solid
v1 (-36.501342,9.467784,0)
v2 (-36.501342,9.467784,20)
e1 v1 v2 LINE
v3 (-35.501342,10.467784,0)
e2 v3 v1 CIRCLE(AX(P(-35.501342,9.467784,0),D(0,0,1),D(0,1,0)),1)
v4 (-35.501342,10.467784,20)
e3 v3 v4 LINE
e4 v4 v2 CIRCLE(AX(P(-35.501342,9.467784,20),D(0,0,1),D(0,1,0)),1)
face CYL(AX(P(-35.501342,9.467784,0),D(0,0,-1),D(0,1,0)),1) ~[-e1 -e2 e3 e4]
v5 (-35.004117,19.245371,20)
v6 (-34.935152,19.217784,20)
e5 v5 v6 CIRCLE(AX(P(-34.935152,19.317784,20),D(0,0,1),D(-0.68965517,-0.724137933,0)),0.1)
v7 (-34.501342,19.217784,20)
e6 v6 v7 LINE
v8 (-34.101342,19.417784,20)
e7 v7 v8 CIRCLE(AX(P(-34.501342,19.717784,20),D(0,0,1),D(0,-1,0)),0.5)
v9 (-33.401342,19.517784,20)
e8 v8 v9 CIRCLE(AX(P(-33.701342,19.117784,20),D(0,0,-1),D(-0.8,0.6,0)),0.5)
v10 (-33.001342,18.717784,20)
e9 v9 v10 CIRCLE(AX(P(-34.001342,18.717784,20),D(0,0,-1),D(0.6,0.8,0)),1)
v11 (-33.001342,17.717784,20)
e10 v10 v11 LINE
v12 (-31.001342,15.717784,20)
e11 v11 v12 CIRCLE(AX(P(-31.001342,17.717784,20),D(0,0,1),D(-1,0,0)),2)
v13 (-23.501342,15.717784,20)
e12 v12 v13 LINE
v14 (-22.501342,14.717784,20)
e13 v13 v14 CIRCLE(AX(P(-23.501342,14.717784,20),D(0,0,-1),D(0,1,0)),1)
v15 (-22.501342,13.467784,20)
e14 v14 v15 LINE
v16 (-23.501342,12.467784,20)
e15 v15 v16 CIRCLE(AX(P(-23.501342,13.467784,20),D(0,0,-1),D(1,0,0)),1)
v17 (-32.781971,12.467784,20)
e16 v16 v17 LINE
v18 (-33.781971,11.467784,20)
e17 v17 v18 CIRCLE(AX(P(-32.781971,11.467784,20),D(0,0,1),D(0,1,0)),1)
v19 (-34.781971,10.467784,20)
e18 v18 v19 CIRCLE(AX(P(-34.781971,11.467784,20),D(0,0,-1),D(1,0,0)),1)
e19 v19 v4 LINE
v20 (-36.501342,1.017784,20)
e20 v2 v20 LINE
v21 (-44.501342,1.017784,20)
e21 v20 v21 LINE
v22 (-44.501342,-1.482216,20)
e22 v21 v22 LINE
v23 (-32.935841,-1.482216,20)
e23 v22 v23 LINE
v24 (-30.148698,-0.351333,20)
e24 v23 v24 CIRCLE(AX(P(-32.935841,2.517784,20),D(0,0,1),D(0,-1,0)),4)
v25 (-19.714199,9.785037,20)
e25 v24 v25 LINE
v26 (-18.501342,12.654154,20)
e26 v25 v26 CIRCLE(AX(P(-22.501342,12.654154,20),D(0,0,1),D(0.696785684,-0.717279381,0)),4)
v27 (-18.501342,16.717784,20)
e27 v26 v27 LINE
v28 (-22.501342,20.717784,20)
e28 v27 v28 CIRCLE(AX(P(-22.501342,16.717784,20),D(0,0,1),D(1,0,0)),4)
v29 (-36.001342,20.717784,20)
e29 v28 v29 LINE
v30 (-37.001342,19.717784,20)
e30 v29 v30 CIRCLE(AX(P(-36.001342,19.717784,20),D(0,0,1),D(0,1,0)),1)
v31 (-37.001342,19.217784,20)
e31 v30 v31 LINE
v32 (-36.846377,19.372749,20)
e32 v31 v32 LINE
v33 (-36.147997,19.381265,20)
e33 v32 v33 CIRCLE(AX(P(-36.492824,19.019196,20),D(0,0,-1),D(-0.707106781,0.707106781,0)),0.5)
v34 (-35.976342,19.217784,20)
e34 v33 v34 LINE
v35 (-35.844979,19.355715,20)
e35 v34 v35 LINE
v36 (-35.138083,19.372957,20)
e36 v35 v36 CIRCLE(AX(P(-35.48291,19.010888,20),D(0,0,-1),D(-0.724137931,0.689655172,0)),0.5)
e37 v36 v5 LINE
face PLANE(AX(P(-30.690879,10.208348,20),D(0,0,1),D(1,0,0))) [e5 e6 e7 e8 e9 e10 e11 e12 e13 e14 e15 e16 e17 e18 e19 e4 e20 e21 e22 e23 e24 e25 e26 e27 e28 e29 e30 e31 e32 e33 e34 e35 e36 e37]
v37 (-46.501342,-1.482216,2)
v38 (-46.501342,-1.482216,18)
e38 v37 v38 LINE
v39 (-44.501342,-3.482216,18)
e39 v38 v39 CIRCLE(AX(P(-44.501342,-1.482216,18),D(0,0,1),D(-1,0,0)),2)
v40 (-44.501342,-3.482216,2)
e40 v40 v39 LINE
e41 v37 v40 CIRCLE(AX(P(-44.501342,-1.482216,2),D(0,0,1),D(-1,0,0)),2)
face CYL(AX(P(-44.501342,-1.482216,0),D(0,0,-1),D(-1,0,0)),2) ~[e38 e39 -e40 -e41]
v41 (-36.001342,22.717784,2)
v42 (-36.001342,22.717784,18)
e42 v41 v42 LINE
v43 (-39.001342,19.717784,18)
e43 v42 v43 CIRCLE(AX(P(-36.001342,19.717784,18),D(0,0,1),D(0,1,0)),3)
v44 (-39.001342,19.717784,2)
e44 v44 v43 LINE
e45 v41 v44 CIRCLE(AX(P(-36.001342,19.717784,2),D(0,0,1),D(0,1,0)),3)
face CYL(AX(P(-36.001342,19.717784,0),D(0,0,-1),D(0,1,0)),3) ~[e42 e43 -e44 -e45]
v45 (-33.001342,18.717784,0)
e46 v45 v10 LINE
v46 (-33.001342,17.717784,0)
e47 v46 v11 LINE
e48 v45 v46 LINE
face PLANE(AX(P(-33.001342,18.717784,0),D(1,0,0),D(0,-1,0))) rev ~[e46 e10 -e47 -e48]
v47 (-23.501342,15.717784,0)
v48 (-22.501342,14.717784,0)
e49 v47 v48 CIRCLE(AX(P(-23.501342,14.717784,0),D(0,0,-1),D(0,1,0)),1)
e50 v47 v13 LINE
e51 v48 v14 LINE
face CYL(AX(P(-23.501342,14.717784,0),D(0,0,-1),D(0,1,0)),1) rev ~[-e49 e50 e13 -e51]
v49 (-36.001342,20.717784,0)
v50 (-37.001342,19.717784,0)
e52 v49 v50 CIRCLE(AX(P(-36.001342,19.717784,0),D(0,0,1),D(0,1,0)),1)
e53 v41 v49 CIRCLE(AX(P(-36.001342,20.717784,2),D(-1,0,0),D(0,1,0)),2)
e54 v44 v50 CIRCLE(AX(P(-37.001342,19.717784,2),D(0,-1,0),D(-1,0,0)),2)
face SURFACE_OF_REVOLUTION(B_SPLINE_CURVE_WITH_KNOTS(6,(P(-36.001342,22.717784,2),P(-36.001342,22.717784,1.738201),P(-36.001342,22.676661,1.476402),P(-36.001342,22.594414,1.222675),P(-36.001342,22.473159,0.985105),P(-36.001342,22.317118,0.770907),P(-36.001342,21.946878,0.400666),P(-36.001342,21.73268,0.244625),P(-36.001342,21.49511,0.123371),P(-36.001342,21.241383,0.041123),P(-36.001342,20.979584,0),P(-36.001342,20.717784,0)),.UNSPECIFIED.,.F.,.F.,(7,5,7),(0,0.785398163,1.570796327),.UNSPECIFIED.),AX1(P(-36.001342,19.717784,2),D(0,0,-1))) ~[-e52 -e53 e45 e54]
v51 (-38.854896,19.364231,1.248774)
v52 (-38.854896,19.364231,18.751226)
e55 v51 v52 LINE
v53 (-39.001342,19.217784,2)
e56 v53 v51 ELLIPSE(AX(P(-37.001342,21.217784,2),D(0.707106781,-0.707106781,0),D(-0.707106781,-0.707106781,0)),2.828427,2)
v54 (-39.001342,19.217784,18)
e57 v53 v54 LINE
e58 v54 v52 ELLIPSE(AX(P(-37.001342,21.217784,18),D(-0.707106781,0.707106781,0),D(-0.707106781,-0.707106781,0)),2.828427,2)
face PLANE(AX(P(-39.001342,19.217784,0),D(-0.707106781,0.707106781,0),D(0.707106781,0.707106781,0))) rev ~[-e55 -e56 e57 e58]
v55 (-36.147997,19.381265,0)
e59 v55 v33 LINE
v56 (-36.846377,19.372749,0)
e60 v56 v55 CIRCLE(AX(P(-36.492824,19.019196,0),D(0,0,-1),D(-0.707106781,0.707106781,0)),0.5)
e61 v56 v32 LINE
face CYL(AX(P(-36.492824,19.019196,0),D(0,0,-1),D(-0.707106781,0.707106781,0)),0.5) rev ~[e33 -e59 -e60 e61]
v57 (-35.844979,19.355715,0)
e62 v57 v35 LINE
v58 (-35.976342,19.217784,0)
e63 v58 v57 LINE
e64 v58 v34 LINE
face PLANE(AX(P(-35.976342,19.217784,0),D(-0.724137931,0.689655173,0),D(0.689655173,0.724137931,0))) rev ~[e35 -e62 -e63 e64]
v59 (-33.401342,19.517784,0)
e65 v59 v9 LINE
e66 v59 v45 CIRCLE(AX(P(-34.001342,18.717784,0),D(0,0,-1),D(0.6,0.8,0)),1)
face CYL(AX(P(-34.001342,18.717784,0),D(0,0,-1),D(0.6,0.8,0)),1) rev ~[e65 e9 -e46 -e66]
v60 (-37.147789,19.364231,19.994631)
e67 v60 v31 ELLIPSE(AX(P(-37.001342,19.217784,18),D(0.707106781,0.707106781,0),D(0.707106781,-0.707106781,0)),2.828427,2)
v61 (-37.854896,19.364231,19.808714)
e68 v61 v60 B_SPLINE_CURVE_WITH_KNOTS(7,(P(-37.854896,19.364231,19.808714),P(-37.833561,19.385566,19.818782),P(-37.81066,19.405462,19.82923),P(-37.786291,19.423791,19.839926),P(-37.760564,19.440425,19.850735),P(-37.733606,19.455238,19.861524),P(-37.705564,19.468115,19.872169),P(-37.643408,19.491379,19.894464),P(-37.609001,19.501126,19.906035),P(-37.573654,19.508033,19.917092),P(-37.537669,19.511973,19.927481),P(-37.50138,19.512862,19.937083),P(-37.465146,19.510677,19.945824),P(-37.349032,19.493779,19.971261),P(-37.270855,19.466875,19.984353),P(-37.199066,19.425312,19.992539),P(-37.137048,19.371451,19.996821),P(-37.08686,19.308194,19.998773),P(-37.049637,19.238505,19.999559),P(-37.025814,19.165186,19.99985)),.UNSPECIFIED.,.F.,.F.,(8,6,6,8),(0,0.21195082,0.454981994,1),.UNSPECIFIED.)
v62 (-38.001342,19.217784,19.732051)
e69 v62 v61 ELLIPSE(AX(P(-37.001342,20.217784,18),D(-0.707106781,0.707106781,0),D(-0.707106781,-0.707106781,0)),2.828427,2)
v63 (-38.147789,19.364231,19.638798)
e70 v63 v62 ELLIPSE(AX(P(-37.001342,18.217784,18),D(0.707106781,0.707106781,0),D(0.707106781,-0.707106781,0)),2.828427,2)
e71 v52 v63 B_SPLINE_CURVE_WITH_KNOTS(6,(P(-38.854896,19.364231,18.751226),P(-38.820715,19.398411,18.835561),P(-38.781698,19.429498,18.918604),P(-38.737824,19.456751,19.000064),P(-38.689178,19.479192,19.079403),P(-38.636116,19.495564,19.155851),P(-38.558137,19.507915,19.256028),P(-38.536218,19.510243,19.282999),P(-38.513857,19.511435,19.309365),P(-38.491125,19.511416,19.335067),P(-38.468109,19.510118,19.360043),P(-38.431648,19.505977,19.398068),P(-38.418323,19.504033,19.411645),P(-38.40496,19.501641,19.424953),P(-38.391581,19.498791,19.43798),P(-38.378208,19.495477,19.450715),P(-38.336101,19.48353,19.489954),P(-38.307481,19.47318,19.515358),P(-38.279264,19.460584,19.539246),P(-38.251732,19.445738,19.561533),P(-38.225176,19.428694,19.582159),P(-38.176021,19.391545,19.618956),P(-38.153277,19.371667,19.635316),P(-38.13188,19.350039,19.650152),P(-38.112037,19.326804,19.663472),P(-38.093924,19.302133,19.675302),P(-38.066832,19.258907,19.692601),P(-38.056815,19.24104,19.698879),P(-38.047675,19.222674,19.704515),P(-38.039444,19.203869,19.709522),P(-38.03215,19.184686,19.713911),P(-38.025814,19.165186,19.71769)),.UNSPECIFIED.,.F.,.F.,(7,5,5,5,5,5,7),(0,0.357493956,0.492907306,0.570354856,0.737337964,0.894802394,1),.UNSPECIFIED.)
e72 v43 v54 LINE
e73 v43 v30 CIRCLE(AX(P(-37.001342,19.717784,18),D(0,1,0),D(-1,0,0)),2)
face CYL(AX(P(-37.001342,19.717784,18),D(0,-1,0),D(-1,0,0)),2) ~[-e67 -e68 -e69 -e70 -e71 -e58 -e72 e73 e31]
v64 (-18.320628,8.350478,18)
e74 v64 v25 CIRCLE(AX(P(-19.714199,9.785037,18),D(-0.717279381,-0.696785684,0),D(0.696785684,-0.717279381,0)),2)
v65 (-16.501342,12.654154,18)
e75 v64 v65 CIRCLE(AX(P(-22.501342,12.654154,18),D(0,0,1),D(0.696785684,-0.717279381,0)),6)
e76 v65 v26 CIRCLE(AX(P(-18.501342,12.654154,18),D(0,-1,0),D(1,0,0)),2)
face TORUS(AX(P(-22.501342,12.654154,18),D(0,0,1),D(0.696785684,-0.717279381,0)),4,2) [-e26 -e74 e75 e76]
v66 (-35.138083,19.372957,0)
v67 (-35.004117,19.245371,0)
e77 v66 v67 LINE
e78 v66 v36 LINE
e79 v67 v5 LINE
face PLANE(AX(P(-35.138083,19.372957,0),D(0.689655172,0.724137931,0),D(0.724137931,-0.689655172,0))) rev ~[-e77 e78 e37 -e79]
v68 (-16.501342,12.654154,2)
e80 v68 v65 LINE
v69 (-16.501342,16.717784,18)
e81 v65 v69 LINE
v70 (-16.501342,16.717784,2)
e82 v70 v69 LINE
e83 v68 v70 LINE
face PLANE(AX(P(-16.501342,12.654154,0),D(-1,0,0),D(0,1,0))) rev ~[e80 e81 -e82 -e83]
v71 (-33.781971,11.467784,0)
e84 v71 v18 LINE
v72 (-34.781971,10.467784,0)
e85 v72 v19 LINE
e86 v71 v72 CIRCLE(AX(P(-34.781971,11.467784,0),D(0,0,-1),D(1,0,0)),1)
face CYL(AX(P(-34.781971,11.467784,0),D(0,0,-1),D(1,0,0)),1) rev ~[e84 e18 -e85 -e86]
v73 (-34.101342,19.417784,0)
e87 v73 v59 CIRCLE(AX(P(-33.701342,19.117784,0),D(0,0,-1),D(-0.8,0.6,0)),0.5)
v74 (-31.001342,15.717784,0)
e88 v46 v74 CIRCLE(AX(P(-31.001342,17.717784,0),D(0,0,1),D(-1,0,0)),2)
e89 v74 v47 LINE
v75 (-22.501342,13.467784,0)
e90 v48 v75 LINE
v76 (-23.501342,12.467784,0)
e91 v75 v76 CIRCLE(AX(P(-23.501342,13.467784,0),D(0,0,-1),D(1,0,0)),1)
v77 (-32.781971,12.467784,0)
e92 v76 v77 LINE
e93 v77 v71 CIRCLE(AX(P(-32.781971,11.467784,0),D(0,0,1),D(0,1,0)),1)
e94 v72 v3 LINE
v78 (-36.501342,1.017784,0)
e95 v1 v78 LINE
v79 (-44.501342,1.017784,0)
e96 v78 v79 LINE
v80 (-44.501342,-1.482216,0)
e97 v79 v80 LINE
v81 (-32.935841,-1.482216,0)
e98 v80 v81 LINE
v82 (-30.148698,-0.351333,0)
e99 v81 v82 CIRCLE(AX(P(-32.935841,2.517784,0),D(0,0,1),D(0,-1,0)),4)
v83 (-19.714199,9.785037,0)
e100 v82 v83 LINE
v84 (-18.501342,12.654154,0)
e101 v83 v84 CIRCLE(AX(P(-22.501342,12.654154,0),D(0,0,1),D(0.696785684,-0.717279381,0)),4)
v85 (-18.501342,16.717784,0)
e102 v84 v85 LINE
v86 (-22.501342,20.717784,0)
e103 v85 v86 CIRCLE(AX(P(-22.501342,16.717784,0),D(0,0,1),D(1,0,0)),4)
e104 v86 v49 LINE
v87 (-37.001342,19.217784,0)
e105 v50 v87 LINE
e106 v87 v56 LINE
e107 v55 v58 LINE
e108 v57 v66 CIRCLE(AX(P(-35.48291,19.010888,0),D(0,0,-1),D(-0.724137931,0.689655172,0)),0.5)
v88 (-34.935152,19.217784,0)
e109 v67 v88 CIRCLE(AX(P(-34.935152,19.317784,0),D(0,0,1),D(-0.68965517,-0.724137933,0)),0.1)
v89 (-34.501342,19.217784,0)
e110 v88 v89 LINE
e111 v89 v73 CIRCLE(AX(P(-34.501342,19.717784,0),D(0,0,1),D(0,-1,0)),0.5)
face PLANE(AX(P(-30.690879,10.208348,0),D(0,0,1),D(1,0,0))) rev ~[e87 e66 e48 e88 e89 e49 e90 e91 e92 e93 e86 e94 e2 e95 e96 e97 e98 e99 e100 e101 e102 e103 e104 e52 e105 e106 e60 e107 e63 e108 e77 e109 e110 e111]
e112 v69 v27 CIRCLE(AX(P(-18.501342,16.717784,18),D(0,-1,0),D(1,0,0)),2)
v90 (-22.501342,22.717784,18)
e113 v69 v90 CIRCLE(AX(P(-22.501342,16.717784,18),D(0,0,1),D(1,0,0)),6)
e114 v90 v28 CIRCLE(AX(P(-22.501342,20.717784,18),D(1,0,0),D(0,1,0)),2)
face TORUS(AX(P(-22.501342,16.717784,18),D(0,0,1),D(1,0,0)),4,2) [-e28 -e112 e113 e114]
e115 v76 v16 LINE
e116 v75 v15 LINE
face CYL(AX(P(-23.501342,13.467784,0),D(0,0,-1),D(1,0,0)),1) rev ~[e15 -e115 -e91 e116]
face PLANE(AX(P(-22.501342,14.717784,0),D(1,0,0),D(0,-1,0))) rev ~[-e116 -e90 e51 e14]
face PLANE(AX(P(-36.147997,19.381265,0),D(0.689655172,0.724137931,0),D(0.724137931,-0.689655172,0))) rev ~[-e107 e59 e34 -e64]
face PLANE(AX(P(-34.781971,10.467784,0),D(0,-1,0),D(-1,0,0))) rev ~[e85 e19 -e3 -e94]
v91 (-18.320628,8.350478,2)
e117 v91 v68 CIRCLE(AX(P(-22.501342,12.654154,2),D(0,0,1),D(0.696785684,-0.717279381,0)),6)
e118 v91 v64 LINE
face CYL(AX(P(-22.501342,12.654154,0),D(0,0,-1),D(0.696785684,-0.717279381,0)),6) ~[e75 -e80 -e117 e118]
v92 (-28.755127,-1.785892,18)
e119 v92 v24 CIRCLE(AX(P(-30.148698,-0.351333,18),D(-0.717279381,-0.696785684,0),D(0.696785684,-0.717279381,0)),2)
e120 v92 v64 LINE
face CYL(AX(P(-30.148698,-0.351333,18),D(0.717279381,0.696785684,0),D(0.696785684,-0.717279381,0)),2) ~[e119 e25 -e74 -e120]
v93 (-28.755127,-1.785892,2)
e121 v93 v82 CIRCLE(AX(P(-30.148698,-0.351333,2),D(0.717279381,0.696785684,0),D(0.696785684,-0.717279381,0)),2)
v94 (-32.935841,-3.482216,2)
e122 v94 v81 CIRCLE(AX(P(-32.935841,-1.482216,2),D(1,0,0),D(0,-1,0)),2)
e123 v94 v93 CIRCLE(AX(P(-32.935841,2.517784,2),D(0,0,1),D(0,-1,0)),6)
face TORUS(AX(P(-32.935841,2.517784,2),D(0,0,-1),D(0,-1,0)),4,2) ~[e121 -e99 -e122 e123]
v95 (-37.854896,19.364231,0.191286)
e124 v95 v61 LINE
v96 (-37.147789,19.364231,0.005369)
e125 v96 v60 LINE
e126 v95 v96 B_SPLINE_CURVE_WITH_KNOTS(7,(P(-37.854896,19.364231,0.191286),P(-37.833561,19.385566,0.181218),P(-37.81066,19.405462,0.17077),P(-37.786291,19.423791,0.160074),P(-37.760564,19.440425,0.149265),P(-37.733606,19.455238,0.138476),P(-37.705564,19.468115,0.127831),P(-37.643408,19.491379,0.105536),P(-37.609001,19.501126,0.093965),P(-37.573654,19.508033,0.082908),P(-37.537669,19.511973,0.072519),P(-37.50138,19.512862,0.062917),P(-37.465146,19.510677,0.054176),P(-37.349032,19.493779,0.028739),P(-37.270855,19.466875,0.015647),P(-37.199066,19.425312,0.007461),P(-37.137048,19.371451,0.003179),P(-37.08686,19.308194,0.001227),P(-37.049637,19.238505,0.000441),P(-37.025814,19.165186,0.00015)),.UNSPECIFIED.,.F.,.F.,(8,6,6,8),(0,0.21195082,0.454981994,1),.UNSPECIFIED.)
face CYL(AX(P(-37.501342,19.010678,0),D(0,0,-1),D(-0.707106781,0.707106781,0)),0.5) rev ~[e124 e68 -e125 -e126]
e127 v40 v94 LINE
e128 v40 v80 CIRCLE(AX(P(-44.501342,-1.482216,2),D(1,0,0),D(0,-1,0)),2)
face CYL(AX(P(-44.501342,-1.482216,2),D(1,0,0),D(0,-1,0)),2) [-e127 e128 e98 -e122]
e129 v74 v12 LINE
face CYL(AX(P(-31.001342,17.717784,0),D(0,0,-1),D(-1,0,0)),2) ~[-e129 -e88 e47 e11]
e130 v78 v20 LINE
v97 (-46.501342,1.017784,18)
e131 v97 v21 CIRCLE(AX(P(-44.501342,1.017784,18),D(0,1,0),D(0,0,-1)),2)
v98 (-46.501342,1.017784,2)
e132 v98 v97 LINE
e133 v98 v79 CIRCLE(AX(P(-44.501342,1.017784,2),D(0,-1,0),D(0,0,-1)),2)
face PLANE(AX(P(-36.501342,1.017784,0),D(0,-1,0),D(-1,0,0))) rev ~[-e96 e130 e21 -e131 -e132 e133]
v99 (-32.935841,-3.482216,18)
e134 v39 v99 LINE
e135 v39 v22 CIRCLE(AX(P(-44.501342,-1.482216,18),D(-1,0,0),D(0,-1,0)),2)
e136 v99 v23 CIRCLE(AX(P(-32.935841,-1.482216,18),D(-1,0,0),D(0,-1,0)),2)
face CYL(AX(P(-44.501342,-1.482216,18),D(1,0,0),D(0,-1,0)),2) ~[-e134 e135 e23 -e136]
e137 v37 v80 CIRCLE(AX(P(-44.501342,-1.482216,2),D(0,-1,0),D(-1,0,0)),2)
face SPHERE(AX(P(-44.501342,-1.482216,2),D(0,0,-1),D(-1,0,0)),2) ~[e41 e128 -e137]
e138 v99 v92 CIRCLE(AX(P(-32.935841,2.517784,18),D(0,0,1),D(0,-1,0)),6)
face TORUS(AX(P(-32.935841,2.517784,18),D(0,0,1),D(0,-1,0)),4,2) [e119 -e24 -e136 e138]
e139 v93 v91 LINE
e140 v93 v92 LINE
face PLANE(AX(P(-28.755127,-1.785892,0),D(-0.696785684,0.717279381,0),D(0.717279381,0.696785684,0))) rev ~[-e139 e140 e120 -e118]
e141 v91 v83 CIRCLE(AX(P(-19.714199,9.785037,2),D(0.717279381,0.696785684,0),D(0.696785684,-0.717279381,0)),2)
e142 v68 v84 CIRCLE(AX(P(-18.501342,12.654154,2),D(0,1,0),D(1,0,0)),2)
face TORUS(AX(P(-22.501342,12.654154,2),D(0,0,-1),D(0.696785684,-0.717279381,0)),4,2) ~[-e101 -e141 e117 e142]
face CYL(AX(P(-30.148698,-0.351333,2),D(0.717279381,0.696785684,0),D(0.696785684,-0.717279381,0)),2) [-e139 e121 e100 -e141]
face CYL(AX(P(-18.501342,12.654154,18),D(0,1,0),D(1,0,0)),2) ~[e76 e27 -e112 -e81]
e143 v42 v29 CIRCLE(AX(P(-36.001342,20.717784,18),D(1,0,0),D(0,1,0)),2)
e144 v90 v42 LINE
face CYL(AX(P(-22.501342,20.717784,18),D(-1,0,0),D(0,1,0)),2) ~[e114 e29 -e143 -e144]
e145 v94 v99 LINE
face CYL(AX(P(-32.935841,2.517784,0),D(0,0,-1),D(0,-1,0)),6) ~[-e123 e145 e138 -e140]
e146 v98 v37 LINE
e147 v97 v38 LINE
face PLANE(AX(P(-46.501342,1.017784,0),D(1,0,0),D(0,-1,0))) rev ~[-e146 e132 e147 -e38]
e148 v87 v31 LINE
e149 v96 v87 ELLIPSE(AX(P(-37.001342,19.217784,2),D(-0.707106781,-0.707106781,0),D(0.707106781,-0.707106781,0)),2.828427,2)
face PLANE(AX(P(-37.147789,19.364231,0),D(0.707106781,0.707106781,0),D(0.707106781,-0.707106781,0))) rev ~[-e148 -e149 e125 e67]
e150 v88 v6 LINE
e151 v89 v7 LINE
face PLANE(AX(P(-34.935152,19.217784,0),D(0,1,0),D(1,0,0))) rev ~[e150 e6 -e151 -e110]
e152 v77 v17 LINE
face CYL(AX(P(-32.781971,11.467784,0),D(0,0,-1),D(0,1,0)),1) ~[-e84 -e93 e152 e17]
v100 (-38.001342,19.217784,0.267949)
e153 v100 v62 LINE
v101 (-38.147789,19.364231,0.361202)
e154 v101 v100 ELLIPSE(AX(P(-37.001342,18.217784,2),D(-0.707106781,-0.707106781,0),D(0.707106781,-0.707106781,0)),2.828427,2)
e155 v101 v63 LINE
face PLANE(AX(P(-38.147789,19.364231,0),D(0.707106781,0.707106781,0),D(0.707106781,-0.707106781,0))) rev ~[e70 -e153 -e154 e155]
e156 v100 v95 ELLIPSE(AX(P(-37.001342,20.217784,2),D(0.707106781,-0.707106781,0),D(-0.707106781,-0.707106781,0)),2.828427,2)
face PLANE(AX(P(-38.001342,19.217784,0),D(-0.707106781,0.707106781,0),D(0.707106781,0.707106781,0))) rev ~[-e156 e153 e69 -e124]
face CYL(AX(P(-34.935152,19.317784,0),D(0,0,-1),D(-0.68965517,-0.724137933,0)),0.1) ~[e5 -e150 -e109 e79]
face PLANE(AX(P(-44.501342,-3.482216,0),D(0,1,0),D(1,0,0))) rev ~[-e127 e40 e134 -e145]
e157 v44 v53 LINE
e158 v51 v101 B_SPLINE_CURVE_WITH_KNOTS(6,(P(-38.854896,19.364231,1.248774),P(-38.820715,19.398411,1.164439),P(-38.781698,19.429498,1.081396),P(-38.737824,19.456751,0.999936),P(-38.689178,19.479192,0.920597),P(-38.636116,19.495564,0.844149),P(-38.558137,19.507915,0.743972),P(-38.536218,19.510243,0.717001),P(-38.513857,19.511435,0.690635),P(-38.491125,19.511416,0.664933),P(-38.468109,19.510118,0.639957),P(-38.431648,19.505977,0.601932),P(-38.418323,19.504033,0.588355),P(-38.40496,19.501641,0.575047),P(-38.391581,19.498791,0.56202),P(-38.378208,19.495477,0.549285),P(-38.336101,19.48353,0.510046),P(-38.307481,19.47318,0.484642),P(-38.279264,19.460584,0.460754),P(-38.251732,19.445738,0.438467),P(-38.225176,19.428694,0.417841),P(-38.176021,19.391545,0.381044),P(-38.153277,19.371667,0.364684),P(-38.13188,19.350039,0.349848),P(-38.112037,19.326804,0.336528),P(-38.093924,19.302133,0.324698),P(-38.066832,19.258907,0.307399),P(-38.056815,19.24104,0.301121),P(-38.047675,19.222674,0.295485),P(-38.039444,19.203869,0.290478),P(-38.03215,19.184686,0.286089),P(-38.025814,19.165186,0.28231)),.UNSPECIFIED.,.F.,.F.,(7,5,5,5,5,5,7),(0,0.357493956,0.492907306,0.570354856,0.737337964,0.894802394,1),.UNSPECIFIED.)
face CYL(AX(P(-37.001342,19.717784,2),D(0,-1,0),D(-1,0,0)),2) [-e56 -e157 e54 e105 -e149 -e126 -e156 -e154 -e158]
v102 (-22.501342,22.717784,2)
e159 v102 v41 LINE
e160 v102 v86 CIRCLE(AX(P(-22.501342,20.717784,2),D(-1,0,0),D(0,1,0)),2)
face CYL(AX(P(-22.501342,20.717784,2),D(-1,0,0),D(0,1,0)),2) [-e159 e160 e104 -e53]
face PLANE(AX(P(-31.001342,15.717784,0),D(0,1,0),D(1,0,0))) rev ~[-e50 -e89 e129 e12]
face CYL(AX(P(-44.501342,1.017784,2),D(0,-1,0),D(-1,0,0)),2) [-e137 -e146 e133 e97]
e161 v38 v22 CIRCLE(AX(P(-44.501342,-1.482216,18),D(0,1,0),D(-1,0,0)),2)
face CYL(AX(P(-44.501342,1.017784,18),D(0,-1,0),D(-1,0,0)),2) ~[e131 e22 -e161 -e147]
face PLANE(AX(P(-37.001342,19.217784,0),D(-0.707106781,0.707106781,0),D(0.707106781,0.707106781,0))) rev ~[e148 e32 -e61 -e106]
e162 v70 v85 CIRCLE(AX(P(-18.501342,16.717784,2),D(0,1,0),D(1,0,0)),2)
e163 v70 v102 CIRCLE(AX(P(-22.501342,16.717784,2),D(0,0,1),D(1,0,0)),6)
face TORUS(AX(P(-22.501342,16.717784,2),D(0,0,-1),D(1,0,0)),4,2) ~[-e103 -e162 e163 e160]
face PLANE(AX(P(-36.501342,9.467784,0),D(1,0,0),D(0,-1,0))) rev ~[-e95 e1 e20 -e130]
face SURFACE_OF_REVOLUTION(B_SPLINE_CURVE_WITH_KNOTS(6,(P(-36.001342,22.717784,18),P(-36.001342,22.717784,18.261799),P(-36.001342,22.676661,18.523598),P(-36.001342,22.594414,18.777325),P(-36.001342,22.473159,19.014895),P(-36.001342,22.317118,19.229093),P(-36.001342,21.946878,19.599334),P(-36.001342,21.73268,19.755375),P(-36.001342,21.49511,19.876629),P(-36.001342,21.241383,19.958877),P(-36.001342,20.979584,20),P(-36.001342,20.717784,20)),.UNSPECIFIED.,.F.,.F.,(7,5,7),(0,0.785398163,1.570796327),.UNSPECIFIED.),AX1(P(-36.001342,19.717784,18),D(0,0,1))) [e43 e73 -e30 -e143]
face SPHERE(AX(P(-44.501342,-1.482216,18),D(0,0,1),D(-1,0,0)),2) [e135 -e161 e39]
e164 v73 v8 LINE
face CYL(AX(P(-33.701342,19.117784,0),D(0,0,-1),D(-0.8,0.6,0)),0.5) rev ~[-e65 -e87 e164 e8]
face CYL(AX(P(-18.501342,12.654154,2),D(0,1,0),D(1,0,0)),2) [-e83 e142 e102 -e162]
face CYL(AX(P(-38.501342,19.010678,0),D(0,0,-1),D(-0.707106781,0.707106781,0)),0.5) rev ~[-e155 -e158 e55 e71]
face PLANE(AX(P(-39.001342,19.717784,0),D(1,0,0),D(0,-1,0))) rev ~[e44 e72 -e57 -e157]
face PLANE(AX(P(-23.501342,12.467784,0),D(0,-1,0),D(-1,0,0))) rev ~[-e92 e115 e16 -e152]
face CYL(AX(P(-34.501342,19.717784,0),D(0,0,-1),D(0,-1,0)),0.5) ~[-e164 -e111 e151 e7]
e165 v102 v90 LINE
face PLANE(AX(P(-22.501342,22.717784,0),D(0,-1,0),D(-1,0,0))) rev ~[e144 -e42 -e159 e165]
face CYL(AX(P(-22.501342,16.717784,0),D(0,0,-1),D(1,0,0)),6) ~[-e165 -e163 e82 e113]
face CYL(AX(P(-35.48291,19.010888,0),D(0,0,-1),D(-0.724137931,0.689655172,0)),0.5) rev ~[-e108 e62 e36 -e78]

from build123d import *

# Parameters (mm, degrees)
F1_DEPTH = 20
F2_R     = 2


# Not quite as in the source:
# - a feature names something its author has since deleted; it is built from what else it names


with BuildPart() as f1:
    # F0 (on Top) → F1 (new body)
    with BuildSketch(Plane.XY):
        with BuildLine():
            ThreePointArc((-33.4013422072, 19.5177844279), (-33.1069150162, 19.1649980234), (-33.0013422072, 18.7177844279))
            Line((-33.0013422072, 18.7177844279), (-33.0013422072, 17.7177844279))
            ThreePointArc((-33.0013422072, 17.7177844279), (-32.4155557696, 16.3035708655), (-31.0013422072, 15.7177844279))
            Line((-31.0013422072, 15.7177844279), (-23.5013422072, 15.7177844279))
            ThreePointArc((-23.5013422072, 15.7177844279), (-22.794235426, 15.424891209), (-22.5013422072, 14.7177844279))
            Line((-22.5013422072, 14.7177844279), (-22.5013422072, 13.4677844279))
            ThreePointArc((-22.5013422072, 13.4677844279), (-22.794235426, 12.7606776467), (-23.5013422072, 12.4677844279))
            Line((-23.5013422072, 12.4677844279), (-32.781970528, 12.4677844279))
            ThreePointArc((-32.781970528, 12.4677844279), (-33.4890773091, 12.174891209), (-33.781970528, 11.4677844279))
            ThreePointArc((-33.781970528, 11.4677844279), (-34.0748637468, 10.7606776467), (-34.781970528, 10.4677844279))
            Line((-34.781970528, 10.4677844279), (-35.5013422072, 10.4677844279))
            ThreePointArc((-35.5013422072, 10.4677844279), (-36.2084489884, 10.174891209), (-36.5013422072, 9.4677844279))
            Line((-36.5013422072, 9.4677844279), (-36.5013422072, 2.9677844279))
            Line((-36.5013422072, 2.9677844279), (-36.5013422072, 1.0177844279))
            Line((-36.5013422072, 1.0177844279), (-38.5013422072, 1.0177844279))
            Line((-38.5013422072, 1.0177844279), (-46.5013422072, 1.0177844279))
            Line((-46.5013422072, 1.0177844279), (-46.5013422072, 0.5177844279))
            Line((-46.5013422072, 0.5177844279), (-46.5013422072, -1.4822155721))
            ThreePointArc((-46.5013422072, -1.4822155721), (-45.9155557696, -2.8964291345), (-44.5013422072, -3.4822155721))
            Line((-44.5013422072, -3.4822155721), (-32.935840724, -3.4822155721))
            ThreePointArc((-32.935840724, -3.4822155721), (-30.679965917, -3.0419843493), (-28.7551266184, -1.7858918573))
            Line((-28.7551266184, -1.7858918573), (-18.3206281016, 8.3504781304))
            ThreePointArc((-18.3206281016, 8.3504781304), (-16.9748476295, 10.3179485849), (-16.5013422072, 12.6541544156))
            Line((-16.5013422072, 12.6541544156), (-16.5013422072, 16.7177844279))
            ThreePointArc((-16.5013422072, 16.7177844279), (-18.2587015201, 20.960425115), (-22.5013422072, 22.7177844279))
            Line((-22.5013422072, 22.7177844279), (-36.0013422072, 22.7177844279))
            ThreePointArc((-36.0013422072, 22.7177844279), (-38.1226625508, 21.8391047714), (-39.0013422072, 19.7177844279))
            Line((-39.0013422072, 19.7177844279), (-39.0013422072, 19.2177844279))
            Line((-39.0013422072, 19.2177844279), (-38.8548955978, 19.3642310373))
            ThreePointArc((-38.8548955978, 19.3642310373), (-38.5013422072, 19.5106776467), (-38.1477888166, 19.3642310373))
            Line((-38.1477888166, 19.3642310373), (-38.0013422072, 19.2177844279))
            Line((-38.0013422072, 19.2177844279), (-37.8548955978, 19.3642310373))
            ThreePointArc((-37.8548955978, 19.3642310373), (-37.5013422072, 19.5106776467), (-37.1477888166, 19.3642310373))
            Line((-37.1477888166, 19.3642310373), (-37.0013422072, 19.2177844279))
            Line((-37.0013422072, 19.2177844279), (-36.8463774903, 19.3727491447))
            ThreePointArc((-36.8463774903, 19.3727491447), (-36.498920301, 19.5191585891), (-36.1479965135, 19.3812647196))
            Line((-36.1479965135, 19.3812647196), (-35.9763422072, 19.2177844279))
            Line((-35.9763422072, 19.2177844279), (-35.8449793172, 19.3557154623))
            ThreePointArc((-35.8449793172, 19.3557154623), (-35.4951018479, 19.5107392214), (-35.1380827655, 19.3729568416))
            Line((-35.1380827655, 19.3729568416), (-35.0041172482, 19.2453706347))
            ThreePointArc((-35.0041172482, 19.2453706347), (-34.9722907986, 19.2249367588), (-34.935151731, 19.2177844279))
            Line((-34.935151731, 19.2177844279), (-34.5013422072, 19.2177844279))
            ThreePointArc((-34.5013422072, 19.2177844279), (-34.2777354094, 19.2705708324), (-34.1013422072, 19.4177844279))
            ThreePointArc((-34.1013422072, 19.4177844279), (-33.7720528853, 19.6127591747), (-33.4013422072, 19.5177844279))
        make_face()
    extrude(amount=F1_DEPTH)

    # F2
    f2_edges = [f1.edges().sort_by_distance(p)[0] for p in [
        (-29.251342, 22.717784, 20),
        (-29.251342, 22.717784, 0),
    ]]
    fillet(f2_edges, radius=F2_R)


solid = f1.part
